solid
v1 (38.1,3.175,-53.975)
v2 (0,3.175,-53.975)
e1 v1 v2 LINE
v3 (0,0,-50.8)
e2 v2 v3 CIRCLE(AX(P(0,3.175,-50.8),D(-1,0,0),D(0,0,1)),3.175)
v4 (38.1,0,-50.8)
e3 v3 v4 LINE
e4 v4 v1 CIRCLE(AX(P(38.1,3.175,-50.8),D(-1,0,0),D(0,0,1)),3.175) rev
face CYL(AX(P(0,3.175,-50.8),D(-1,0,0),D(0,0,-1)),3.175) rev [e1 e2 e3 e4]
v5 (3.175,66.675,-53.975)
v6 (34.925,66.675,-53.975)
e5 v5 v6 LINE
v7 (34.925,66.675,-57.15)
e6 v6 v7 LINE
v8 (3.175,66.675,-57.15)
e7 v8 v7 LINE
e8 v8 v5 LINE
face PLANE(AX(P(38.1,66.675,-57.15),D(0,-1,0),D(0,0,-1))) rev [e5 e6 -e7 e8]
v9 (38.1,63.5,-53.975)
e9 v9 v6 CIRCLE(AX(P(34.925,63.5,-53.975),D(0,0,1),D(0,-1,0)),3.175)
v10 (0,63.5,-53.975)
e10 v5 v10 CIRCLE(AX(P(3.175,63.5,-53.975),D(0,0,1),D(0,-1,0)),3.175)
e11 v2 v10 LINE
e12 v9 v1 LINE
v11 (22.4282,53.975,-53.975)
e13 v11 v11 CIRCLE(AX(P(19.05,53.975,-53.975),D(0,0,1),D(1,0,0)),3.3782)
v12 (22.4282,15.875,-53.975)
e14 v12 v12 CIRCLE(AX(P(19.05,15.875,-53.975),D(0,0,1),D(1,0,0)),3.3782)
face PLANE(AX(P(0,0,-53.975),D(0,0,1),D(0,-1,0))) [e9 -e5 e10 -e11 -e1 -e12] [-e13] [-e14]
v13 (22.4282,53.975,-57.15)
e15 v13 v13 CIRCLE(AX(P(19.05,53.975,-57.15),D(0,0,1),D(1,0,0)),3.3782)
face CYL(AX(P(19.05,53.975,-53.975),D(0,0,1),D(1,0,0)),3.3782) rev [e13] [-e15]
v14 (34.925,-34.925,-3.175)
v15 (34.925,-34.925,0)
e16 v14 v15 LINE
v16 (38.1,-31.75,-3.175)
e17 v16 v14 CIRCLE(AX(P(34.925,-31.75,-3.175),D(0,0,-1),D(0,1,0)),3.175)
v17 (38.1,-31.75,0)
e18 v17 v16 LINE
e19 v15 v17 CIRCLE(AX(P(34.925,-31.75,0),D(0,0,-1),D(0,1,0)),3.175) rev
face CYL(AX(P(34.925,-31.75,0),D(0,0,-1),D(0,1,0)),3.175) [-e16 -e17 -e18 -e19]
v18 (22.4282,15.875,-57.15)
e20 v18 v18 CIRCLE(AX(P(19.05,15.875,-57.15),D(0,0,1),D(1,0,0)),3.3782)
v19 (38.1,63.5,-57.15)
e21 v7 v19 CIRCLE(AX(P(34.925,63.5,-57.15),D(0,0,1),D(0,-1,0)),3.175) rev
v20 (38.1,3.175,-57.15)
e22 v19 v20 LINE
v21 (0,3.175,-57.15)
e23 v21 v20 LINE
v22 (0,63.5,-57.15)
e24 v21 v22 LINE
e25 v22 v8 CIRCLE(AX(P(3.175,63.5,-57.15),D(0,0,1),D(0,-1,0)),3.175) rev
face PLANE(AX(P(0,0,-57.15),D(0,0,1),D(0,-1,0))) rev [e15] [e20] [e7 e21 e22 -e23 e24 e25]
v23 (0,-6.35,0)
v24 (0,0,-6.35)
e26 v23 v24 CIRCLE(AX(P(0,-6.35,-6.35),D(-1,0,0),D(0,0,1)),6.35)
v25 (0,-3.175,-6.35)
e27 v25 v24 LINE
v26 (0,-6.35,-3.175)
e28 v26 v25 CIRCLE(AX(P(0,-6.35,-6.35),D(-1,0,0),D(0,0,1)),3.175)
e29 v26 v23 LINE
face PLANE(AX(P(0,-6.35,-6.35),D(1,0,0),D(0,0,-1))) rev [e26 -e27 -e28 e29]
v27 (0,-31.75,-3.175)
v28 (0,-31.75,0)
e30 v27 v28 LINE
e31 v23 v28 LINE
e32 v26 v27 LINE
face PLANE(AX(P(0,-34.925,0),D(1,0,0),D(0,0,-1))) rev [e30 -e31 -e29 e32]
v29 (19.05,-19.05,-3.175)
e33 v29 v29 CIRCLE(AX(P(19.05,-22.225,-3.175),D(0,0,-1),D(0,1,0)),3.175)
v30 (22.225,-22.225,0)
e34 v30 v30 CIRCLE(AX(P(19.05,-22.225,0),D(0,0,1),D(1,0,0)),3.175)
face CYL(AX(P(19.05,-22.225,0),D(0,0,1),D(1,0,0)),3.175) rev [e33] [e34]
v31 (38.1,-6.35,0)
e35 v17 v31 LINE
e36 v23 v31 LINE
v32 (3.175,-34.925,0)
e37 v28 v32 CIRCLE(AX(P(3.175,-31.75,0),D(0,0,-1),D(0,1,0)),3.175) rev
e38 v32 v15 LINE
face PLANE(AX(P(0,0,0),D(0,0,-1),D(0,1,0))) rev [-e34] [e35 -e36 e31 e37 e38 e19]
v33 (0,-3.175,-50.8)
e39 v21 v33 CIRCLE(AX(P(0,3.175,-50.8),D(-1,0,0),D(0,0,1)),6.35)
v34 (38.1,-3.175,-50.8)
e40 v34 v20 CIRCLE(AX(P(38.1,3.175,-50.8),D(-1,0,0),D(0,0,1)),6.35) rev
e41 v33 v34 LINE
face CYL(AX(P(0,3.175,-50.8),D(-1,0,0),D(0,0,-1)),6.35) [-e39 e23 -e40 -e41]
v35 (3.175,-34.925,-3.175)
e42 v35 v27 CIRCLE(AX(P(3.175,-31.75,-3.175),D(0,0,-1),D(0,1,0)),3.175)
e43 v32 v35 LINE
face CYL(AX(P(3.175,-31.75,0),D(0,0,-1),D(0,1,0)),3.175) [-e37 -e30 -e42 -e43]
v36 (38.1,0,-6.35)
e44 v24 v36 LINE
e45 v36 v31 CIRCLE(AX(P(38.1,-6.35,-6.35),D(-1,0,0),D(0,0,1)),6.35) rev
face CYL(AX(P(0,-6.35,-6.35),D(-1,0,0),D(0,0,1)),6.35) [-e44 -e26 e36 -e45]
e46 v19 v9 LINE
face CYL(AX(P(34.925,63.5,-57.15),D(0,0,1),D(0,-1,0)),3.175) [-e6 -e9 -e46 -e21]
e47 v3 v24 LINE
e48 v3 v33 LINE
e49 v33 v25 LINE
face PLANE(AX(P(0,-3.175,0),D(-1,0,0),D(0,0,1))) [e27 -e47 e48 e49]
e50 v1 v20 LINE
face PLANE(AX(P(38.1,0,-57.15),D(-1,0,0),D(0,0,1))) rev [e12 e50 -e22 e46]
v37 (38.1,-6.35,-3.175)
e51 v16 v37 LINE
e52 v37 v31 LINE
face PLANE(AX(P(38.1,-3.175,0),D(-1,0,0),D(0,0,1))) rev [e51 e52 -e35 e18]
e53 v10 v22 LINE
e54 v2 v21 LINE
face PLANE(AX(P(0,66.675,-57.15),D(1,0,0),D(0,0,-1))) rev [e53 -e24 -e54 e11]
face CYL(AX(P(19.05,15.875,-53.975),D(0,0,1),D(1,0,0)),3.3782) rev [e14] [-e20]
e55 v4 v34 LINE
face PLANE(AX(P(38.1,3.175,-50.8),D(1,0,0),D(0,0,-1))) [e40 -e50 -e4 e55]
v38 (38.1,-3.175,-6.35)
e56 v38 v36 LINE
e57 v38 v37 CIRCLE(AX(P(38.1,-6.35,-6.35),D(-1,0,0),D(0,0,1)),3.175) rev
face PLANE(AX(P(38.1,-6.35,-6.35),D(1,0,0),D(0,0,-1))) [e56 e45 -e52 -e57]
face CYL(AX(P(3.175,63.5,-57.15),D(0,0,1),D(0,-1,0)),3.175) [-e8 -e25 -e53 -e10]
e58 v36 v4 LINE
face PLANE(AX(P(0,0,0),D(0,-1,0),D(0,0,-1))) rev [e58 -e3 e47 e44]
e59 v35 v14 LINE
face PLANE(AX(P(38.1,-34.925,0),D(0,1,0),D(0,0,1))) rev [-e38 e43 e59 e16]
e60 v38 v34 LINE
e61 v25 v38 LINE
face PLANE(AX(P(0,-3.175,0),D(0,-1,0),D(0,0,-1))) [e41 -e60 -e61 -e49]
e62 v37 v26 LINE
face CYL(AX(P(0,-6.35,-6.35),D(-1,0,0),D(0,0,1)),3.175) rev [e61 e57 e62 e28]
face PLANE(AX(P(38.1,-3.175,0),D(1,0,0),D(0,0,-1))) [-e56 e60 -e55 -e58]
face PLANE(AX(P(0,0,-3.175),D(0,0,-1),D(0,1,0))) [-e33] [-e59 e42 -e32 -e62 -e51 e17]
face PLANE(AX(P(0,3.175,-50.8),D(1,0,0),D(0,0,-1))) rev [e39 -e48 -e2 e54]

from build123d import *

# Parameters (mm, degrees)
SKETCH1_W                    = 38.1
SKETCH1_H                    = 57.15
BASE_FLANGE1_DEPTH           = 3.175
EDGE_FLANGE1_STRIP_W         = 19.05
EDGE_FLANGE1_STRIP_H         = 3.175
EDGE_FLANGE1_STRIP_CUT_DEPTH = 38.1
EDGE_FLANGE1_DEPTH           = 38.1
EDGE_FLANGE2_STRIP_W         = 19.05
EDGE_FLANGE2_STRIP_H         = 3.175
EDGE_FLANGE2_STRIP_CUT_DEPTH = 38.1
EDGE_FLANGE2_DEPTH           = 38.1
F_1_4_CLEARANCE_HOLE1_D      = 6.7564
F_1_4_20_TAPPED_HOLE1_D      = 6.35
BREAK_CORNER1_START          = -57.15
BREAK_CORNER1_DEPTH          = 57.15


# Read off the part's stored shape, not the designer's step: Break-Corner1
# Sheet-metal steps are written as plain solids
with BuildPart() as part:
    # Sketch1 → Base-Flange1 (new body)
    with BuildSketch(Plane(origin=(0, 0, 0), x_dir=(1, 0, 0), z_dir=(0, 1, 0))):
        with Locations((19.05, 28.575)):
            Rectangle(SKETCH1_W, SKETCH1_H)
    extrude(amount=-BASE_FLANGE1_DEPTH)

    # Edge-Flange1 strip (across the edge) → Edge-Flange1 strip cut (cut)
    with BuildSketch(Plane(origin=(38.1, 0, -57.15), x_dir=(0, 0, 1), z_dir=(-1, 0, 0))):
        with Locations((-3.175, -1.5875)):
            Rectangle(EDGE_FLANGE1_STRIP_W, EDGE_FLANGE1_STRIP_H)
    extrude(amount=EDGE_FLANGE1_STRIP_CUT_DEPTH, mode=Mode.SUBTRACT)

    # Edge-Flange1 section (across the edge) → Edge-Flange1 (add)
    with BuildSketch(Plane(origin=(38.1, 0, -57.15), x_dir=(0, 0, 1), z_dir=(-1, 0, 0))):
        with BuildLine():
            Line((0, 3.175), (0, 66.675))
            Line((0, 66.675), (3.175, 66.675))
            Line((3.175, 66.675), (3.175, 3.175))
            ThreePointArc((3.175, 3.175), (4.10493597, 0.92993597), (6.35, 0))
            Line((6.35, 0), (6.35, -3.175))
            ThreePointArc((6.35, -3.175), (1.859871939, -1.315128061), (0, 3.175))
        make_face()
    extrude(amount=EDGE_FLANGE1_DEPTH)

    # Edge-Flange2 strip (across the edge) → Edge-Flange2 strip cut (cut)
    with BuildSketch(Plane(origin=(38.1, -3.175, 0), x_dir=(0, 0, -1), z_dir=(-1, 0, 0))):
        with Locations((-3.175, -1.5875)):
            Rectangle(EDGE_FLANGE2_STRIP_W, EDGE_FLANGE2_STRIP_H)
    extrude(amount=EDGE_FLANGE2_STRIP_CUT_DEPTH, mode=Mode.SUBTRACT)

    # Edge-Flange2 section (across the edge) → Edge-Flange2 (add)
    with BuildSketch(Plane(origin=(38.1, -3.175, 0), x_dir=(0, 0, -1), z_dir=(-1, 0, 0))):
        with BuildLine():
            Line((0, 3.175), (0, 31.75))
            Line((0, 31.75), (3.175, 31.75))
            Line((3.175, 31.75), (3.175, 3.175))
            ThreePointArc((3.175, 3.175), (4.10493597, 0.92993597), (6.35, 0))
            Line((6.35, 0), (6.35, -3.175))
            ThreePointArc((6.35, -3.175), (1.859871939, -1.315128061), (0, 3.175))
        make_face()
    extrude(amount=EDGE_FLANGE2_DEPTH)

    # 1/4 Clearance Hole1 (through all)
    with Locations(Plane.XY.offset(-53.975)):
        with Locations((19.05, 53.975), (19.05, 15.875)):
            Hole(F_1_4_CLEARANCE_HOLE1_D / 2)

    # 1/4-20 Tapped Hole1 (through all)
    with Locations(Plane.XY):
        with Locations((19.05, -22.225)):
            Hole(F_1_4_20_TAPPED_HOLE1_D / 2)

    # Break-Corner1 outline → Break-Corner1 (cut)
    with BuildSketch(Plane.XY.offset(BREAK_CORNER1_START)):
        with BuildLine():
            Line((38.1, -34.925), (38.1, -31.75))
            ThreePointArc((38.1, -31.75), (37.17006403, -33.99506403), (34.925, -34.925))
            Line((34.925, -34.925), (38.1, -34.925))
        make_face()
        with BuildLine():
            Line((0, -34.925), (3.175, -34.925))
            ThreePointArc((3.175, -34.925), (0.92993597, -33.99506403), (0, -31.75))
            Line((0, -31.75), (0, -34.925))
        make_face()
        with BuildLine():
            ThreePointArc((0, 63.5), (0.92993597, 65.74506403), (3.175, 66.675))
            Line((3.175, 66.675), (0, 66.675))
            Line((0, 66.675), (0, 63.5))
        make_face()
        with BuildLine():
            ThreePointArc((34.925, 66.675), (37.17006403, 65.74506403), (38.1, 63.5))
            Line((38.1, 63.5), (38.1, 66.675))
            Line((38.1, 66.675), (34.925, 66.675))
        make_face()
    extrude(amount=BREAK_CORNER1_DEPTH, mode=Mode.SUBTRACT)


solid = part.part
